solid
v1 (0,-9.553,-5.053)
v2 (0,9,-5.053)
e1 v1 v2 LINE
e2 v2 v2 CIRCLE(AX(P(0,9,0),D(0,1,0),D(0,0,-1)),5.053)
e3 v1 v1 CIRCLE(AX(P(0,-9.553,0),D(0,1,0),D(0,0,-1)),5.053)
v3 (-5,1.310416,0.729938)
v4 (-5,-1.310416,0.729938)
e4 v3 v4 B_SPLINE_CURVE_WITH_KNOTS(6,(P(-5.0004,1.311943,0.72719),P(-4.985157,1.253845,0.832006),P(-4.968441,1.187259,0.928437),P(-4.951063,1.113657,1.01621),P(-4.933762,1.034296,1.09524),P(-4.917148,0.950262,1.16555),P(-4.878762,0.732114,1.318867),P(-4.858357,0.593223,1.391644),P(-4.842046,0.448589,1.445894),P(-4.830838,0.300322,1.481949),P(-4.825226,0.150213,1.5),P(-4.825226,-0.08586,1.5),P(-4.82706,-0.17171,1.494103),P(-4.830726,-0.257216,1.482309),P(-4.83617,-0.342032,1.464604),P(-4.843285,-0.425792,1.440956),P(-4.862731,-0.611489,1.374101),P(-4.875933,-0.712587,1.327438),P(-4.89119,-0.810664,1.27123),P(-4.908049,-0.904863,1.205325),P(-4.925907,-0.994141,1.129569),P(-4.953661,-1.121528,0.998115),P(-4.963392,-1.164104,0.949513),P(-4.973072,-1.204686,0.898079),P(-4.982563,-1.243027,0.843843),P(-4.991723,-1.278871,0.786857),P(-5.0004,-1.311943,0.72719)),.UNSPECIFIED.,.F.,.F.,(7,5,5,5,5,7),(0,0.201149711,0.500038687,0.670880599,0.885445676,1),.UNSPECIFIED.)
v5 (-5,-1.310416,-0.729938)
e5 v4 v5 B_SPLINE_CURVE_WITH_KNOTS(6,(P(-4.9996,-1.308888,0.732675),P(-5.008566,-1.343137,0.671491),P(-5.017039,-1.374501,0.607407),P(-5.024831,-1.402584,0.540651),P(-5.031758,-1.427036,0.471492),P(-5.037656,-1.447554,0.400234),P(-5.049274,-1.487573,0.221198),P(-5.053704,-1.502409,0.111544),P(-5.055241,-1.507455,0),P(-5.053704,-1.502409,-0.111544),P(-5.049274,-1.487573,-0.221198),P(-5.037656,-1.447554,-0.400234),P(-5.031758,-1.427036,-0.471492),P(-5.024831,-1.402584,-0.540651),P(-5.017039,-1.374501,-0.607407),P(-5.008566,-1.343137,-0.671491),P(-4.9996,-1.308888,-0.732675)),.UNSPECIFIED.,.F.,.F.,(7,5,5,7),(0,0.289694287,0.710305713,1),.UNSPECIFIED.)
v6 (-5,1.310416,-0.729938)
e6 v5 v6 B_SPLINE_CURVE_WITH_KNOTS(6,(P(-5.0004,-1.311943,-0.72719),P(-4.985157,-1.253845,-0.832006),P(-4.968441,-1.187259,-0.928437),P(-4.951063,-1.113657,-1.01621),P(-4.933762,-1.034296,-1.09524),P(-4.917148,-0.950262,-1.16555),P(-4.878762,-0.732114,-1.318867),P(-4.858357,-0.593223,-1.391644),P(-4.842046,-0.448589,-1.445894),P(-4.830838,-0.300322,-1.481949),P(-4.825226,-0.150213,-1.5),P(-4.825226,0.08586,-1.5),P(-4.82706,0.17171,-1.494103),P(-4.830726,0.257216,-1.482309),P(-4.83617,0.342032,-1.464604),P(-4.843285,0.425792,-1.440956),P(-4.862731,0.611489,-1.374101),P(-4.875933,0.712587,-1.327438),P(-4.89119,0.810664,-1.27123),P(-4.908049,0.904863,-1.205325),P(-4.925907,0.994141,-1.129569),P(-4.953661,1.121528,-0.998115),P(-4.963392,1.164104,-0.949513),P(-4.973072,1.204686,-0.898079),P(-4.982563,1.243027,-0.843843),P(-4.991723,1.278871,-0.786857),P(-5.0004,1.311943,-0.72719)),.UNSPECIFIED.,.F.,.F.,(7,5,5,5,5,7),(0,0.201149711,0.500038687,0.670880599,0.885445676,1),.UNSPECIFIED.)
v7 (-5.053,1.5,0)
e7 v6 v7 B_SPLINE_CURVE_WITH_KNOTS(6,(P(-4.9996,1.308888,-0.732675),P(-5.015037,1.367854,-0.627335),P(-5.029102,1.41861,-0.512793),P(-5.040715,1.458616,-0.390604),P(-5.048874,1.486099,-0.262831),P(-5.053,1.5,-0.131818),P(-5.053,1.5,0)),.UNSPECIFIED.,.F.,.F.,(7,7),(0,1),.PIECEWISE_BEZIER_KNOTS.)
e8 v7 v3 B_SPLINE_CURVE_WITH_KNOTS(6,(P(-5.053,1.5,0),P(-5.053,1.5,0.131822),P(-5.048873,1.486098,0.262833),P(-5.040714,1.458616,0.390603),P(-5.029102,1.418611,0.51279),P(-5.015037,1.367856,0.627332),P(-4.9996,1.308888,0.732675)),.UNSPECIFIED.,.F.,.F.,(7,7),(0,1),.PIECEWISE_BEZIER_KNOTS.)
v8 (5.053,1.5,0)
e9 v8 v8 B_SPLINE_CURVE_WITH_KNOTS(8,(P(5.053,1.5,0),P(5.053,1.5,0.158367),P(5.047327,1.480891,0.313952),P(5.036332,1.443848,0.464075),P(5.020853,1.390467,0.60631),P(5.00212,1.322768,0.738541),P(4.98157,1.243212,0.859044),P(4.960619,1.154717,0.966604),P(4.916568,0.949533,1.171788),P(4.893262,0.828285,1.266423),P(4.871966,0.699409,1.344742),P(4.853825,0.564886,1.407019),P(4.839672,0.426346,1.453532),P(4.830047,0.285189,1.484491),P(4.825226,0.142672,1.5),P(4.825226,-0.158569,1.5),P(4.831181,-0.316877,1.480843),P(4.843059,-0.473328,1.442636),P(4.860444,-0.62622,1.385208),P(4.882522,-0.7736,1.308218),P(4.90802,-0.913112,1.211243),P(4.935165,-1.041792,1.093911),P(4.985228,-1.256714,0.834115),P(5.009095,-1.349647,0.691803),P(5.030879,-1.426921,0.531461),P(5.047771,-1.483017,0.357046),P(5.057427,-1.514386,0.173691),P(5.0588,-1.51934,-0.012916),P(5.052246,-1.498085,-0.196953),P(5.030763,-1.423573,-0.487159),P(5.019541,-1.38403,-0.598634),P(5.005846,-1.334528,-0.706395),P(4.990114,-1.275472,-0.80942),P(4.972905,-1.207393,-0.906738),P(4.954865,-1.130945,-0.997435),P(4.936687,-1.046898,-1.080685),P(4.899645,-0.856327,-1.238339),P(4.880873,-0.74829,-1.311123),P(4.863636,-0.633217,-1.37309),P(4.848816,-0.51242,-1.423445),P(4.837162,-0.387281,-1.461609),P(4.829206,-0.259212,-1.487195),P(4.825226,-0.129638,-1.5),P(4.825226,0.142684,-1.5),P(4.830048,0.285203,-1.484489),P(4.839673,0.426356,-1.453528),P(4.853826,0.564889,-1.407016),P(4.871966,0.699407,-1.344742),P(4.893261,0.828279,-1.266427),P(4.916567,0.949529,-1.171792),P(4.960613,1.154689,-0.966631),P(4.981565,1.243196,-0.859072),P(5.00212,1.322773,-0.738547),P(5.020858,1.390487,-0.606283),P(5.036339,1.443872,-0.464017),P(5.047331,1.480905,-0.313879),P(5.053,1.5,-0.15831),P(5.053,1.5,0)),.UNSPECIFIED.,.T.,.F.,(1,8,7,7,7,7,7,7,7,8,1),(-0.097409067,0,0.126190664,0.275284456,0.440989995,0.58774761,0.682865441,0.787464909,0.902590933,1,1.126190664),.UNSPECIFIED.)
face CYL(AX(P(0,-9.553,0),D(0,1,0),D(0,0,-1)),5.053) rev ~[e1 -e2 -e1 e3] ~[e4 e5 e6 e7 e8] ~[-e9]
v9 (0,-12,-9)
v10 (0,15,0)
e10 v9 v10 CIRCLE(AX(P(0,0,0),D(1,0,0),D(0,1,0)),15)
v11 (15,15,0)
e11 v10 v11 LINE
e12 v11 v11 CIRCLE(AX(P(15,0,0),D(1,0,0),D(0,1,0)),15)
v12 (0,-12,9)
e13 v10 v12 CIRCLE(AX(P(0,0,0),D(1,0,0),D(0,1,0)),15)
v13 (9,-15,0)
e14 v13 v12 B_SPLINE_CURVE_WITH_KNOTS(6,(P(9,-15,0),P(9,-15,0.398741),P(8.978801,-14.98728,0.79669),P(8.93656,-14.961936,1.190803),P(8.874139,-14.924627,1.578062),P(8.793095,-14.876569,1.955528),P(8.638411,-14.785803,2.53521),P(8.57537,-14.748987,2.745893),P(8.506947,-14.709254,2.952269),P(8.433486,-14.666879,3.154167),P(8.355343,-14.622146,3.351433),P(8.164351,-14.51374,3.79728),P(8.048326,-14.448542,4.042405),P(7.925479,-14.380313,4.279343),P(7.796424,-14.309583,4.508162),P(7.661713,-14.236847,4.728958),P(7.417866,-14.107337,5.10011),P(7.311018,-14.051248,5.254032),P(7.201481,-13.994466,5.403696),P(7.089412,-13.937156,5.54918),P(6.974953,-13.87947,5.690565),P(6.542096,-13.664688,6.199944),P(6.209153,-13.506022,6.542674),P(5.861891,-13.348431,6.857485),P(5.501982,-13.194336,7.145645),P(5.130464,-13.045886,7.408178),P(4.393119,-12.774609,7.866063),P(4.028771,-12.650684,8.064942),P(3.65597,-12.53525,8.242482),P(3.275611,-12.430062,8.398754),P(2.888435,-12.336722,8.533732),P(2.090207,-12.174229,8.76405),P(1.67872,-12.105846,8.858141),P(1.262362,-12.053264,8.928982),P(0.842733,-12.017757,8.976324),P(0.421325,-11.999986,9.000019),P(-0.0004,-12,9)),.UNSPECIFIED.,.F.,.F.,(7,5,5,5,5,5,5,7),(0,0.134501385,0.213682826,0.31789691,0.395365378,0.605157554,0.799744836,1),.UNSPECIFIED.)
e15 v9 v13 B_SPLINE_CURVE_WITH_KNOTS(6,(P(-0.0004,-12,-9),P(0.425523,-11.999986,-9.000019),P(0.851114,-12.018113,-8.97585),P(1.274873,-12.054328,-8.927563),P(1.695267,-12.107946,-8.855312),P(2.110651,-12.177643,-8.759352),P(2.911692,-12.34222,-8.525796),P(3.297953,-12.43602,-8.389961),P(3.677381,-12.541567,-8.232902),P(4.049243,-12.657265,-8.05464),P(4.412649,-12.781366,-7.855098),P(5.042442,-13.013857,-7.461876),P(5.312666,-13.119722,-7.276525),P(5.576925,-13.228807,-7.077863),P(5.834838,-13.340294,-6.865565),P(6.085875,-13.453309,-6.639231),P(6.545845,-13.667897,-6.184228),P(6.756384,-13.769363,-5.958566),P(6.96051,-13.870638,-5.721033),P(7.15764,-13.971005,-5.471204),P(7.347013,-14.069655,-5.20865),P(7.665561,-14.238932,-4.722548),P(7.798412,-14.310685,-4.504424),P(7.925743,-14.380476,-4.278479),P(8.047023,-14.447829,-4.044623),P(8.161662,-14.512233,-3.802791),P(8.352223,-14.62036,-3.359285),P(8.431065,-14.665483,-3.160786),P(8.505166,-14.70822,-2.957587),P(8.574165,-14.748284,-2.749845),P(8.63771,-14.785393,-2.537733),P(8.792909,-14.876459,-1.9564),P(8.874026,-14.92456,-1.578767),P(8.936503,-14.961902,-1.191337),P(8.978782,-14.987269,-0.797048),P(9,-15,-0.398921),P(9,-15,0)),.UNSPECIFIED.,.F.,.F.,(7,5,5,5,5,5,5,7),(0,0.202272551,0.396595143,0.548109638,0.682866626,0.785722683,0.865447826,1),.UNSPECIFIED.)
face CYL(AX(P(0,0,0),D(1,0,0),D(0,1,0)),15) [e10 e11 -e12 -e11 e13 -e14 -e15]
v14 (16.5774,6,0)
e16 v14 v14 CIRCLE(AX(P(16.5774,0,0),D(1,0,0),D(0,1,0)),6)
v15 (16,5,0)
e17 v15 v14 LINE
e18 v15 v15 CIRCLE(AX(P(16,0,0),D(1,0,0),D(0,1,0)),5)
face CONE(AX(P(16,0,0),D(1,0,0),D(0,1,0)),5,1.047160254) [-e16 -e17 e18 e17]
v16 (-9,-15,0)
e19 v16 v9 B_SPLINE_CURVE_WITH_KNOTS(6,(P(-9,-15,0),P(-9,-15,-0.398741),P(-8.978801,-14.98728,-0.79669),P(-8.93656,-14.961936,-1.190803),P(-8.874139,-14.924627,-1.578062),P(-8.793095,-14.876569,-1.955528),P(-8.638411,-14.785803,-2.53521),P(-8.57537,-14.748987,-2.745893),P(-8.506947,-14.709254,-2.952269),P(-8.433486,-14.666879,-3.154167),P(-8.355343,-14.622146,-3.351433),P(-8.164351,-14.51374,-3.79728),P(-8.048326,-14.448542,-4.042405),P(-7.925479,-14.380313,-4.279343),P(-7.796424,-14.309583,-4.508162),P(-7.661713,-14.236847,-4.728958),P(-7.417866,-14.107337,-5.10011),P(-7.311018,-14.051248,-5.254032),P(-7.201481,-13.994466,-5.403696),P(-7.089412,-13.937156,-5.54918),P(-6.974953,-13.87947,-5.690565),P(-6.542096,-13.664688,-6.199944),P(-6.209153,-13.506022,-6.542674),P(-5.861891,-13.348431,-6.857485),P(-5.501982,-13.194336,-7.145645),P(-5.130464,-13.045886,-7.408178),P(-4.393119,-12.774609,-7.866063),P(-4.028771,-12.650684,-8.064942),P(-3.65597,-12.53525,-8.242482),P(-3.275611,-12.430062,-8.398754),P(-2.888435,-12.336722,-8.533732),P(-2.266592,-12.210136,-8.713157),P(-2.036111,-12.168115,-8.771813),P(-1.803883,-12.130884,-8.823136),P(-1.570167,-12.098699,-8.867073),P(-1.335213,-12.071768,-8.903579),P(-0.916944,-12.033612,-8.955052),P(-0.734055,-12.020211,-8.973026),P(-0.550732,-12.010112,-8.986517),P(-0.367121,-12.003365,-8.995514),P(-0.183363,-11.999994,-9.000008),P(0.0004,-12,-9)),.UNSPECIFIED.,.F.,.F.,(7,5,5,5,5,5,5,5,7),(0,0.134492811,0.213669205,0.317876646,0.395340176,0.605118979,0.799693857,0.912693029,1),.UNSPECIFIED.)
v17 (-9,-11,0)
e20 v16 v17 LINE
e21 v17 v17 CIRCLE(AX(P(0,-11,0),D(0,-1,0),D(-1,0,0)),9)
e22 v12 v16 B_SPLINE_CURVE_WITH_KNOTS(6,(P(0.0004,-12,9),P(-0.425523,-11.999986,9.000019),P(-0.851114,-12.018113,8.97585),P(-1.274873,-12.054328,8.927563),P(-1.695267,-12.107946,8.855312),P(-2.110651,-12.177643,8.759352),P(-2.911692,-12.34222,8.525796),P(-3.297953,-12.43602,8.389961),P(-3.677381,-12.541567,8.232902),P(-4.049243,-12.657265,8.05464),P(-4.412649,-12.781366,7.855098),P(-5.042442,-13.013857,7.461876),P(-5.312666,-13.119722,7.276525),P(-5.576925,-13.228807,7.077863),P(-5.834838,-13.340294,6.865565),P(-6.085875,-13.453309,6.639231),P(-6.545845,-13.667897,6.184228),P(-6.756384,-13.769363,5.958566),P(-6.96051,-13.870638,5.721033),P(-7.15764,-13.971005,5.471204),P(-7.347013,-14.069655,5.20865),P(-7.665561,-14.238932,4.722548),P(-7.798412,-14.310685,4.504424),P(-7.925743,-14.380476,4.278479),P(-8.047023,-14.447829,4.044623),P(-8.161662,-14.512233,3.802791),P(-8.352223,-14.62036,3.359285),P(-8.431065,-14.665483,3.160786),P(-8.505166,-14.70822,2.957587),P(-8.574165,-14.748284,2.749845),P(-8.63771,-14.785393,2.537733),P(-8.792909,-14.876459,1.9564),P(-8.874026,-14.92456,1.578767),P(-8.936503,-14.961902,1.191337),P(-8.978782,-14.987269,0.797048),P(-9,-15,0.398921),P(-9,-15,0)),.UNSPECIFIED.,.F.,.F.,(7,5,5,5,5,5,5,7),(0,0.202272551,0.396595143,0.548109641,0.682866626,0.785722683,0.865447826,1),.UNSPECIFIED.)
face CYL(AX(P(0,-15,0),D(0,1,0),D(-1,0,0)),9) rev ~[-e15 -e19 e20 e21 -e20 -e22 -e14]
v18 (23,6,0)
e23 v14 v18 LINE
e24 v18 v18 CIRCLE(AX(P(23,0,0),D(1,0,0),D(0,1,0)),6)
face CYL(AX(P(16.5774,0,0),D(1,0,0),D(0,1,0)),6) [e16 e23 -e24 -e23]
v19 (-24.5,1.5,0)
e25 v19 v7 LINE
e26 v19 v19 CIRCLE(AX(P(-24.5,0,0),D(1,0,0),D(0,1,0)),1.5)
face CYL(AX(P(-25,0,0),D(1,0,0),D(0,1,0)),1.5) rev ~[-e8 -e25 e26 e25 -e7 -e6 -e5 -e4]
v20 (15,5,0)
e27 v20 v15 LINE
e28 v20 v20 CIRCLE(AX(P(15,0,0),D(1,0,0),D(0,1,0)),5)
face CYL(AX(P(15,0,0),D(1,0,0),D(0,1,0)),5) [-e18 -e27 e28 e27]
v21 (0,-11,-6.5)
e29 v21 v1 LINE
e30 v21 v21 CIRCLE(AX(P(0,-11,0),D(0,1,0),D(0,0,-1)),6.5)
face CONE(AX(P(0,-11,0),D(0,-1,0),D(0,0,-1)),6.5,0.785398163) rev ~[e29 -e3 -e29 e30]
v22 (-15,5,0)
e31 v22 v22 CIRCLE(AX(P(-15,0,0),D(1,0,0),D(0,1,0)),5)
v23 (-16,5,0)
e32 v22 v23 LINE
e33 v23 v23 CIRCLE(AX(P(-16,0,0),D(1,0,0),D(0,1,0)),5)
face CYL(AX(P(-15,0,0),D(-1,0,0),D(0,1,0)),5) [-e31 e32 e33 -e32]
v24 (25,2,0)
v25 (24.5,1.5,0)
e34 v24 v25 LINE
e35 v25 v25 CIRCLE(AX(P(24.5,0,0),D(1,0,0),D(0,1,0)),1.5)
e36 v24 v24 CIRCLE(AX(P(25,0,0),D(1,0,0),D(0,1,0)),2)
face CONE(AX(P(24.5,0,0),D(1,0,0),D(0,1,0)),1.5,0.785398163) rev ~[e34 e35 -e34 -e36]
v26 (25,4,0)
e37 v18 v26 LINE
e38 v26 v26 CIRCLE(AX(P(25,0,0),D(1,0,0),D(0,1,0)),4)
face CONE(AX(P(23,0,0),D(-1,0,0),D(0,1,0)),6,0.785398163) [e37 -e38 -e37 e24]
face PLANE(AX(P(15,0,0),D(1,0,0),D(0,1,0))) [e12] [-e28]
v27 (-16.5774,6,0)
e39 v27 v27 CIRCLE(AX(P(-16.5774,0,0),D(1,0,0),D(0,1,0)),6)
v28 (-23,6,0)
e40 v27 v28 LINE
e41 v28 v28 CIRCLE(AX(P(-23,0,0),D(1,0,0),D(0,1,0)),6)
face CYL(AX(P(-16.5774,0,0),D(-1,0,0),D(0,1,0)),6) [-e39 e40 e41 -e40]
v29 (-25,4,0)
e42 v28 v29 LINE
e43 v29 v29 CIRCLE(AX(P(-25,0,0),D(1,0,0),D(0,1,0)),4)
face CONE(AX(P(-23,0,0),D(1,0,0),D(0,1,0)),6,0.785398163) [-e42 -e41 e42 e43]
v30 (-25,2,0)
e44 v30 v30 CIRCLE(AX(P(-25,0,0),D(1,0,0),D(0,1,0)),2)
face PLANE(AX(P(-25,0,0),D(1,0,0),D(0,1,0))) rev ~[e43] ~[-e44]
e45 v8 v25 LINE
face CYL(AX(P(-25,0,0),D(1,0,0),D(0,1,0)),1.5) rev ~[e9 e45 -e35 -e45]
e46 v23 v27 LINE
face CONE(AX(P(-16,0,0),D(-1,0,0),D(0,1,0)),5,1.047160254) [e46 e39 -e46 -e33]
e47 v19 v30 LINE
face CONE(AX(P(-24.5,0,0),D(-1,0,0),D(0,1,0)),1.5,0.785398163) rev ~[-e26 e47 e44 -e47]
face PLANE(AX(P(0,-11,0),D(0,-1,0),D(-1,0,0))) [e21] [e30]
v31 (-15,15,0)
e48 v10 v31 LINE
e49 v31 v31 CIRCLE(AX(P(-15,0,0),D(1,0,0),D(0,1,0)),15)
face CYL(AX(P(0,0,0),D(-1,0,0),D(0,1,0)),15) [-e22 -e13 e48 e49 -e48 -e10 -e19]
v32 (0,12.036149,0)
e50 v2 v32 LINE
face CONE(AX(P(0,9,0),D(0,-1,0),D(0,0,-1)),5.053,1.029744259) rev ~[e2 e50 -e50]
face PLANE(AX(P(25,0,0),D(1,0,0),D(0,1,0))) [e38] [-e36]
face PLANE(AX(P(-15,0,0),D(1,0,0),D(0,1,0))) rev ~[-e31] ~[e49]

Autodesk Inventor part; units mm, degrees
ref_plane "YZ Plane" through (0, 0, 0) normal (1, 0, 0) x (0, 1, 0)
ref_plane "XZ Plane" through (0, 0, 0) normal (0, 1, 0) x (-1, 0, 0)
ref_plane "XY Plane" through (0, 0, 0) normal (0, 0, 1) x (1, 0, 0)
sketch "Sketch1" plane through (0, 0, 0) normal (0, 0, 1) x (1, 0, 0)
  line L0 (-35, 0) -> (35, 0) construction
  line L1 (0, -21) -> (0, 21) construction
  line L2 (0, 15) -> (-15, 15)
  line L3 (-15, 15) -> (-15, 5)
  line L4 (-15, 5) -> (-16, 5)
  line L5 (-16, 5) -> (-16.5774, 6)
  line L6 (-16.5774, 6) -> (-25, 6)
  line L7 (-25, 6) -> (-25, 0)
  line L8 (0, 15) -> (15, 15)
  line L9 (15, 15) -> (15, 5)
  line L10 (15, 5) -> (16, 5)
  line L11 (16, 5) -> (16.5774, 6)
  line L12 (16.5774, 6) -> (25, 6)
  line L13 (25, 6) -> (25, 0)
  line L14 (0, -15) -> (-15, -15)
  line L15 (-15, -15) -> (-15, -5)
  line L16 (-15, -5) -> (-16, -5)
  line L17 (-16, -5) -> (-16.5774, -6)
  line L18 (-16.5774, -6) -> (-25, -6)
  line L19 (-25, -6) -> (-25, 0)
  line L20 (15, -15) -> (15, -5)
  line L21 (15, -5) -> (16, -5)
  line L22 (16, -5) -> (16.5774, -6)
  line L23 (16.5774, -6) -> (25, -6)
  line L24 (25, -6) -> (25, 0)
  line L25 (0, -15) -> (15, -15)
  line L26 (-9, -15) -> (-9, -11)
  line L27 (-9, -11) -> (-5, -11)
  line L28 (-5, -11) -> (-5, 8)
  line L29 (-5, 8) -> (0, 11.0043)
  line L30 (0, 11.0043) -> (0, -15)
  line L31 (-25, 0) -> (25, 0)
  line L32 (-25, 1.5) -> (25, 1.5)
  point P0 (0, 0)
  dimension "d0" = 30
  dimension "d1" = 12
  dimension "d3" = 8.4227
  dimension "d5" = 60
  dimension "d6" = 10
  dimension "d7" = 30
  dimension "d8" = 50
  dimension "d9" = 59
  dimension "d10" = 10
  dimension "d11" = 4
  dimension "d12" = 18
  dimension "d13" = 23
  dimension "d23" = 3
  dimension "d27" = 10
  dimension "d29" = 1
revolve "Revolution1" add sketch "Sketch1" angle 360 about axis through (-25, 0, 0) along (1, 0, 0) contours L8 L9 L10 L11 L12 L13 L32 L30 L29 L28 L7 L6 L5 L4 L3 L2 | L28 L29 L30 L32
revolve "Revolution2" cut sketch "Sketch1" angle 360 about axis through (0, 11.0043, 0) along (0, -1, 0) contours L32 L30 L31 L28 | L28 L29 L30 L32 | L31 L30 L14 L26 L27 L28
thread "Thread2" size "M12x1.75" class "6g" standard "ISO Metric profile" full length
chamfer "Chamfer1" distance 2 angle 45 2 edges at (-25, -6, 0) (25, -6, 0)
chamfer "Chamfer2" distance 0.5 angle 45 2 edges at (-25, -1.5, 0) (25, -1.5, 0)
sketch "Sketch2" plane through (0, -11, 0) normal (0, -1, 0) x (0, 0, -1)
  circle A0 centre (0, 0) radius 5 projected
  point P0 (0, 0)
hole "Hole1" at (0, -11, 0) direction (0, 1, 0) diameter 10.106 depth 20 tip angle 118 countersink diameter 13 countersink angle 90 thread size "M12x1.75" class "6H" standard "ISO Metric profile"
properties part number "HM1-002" material "Steel, Alloy"
